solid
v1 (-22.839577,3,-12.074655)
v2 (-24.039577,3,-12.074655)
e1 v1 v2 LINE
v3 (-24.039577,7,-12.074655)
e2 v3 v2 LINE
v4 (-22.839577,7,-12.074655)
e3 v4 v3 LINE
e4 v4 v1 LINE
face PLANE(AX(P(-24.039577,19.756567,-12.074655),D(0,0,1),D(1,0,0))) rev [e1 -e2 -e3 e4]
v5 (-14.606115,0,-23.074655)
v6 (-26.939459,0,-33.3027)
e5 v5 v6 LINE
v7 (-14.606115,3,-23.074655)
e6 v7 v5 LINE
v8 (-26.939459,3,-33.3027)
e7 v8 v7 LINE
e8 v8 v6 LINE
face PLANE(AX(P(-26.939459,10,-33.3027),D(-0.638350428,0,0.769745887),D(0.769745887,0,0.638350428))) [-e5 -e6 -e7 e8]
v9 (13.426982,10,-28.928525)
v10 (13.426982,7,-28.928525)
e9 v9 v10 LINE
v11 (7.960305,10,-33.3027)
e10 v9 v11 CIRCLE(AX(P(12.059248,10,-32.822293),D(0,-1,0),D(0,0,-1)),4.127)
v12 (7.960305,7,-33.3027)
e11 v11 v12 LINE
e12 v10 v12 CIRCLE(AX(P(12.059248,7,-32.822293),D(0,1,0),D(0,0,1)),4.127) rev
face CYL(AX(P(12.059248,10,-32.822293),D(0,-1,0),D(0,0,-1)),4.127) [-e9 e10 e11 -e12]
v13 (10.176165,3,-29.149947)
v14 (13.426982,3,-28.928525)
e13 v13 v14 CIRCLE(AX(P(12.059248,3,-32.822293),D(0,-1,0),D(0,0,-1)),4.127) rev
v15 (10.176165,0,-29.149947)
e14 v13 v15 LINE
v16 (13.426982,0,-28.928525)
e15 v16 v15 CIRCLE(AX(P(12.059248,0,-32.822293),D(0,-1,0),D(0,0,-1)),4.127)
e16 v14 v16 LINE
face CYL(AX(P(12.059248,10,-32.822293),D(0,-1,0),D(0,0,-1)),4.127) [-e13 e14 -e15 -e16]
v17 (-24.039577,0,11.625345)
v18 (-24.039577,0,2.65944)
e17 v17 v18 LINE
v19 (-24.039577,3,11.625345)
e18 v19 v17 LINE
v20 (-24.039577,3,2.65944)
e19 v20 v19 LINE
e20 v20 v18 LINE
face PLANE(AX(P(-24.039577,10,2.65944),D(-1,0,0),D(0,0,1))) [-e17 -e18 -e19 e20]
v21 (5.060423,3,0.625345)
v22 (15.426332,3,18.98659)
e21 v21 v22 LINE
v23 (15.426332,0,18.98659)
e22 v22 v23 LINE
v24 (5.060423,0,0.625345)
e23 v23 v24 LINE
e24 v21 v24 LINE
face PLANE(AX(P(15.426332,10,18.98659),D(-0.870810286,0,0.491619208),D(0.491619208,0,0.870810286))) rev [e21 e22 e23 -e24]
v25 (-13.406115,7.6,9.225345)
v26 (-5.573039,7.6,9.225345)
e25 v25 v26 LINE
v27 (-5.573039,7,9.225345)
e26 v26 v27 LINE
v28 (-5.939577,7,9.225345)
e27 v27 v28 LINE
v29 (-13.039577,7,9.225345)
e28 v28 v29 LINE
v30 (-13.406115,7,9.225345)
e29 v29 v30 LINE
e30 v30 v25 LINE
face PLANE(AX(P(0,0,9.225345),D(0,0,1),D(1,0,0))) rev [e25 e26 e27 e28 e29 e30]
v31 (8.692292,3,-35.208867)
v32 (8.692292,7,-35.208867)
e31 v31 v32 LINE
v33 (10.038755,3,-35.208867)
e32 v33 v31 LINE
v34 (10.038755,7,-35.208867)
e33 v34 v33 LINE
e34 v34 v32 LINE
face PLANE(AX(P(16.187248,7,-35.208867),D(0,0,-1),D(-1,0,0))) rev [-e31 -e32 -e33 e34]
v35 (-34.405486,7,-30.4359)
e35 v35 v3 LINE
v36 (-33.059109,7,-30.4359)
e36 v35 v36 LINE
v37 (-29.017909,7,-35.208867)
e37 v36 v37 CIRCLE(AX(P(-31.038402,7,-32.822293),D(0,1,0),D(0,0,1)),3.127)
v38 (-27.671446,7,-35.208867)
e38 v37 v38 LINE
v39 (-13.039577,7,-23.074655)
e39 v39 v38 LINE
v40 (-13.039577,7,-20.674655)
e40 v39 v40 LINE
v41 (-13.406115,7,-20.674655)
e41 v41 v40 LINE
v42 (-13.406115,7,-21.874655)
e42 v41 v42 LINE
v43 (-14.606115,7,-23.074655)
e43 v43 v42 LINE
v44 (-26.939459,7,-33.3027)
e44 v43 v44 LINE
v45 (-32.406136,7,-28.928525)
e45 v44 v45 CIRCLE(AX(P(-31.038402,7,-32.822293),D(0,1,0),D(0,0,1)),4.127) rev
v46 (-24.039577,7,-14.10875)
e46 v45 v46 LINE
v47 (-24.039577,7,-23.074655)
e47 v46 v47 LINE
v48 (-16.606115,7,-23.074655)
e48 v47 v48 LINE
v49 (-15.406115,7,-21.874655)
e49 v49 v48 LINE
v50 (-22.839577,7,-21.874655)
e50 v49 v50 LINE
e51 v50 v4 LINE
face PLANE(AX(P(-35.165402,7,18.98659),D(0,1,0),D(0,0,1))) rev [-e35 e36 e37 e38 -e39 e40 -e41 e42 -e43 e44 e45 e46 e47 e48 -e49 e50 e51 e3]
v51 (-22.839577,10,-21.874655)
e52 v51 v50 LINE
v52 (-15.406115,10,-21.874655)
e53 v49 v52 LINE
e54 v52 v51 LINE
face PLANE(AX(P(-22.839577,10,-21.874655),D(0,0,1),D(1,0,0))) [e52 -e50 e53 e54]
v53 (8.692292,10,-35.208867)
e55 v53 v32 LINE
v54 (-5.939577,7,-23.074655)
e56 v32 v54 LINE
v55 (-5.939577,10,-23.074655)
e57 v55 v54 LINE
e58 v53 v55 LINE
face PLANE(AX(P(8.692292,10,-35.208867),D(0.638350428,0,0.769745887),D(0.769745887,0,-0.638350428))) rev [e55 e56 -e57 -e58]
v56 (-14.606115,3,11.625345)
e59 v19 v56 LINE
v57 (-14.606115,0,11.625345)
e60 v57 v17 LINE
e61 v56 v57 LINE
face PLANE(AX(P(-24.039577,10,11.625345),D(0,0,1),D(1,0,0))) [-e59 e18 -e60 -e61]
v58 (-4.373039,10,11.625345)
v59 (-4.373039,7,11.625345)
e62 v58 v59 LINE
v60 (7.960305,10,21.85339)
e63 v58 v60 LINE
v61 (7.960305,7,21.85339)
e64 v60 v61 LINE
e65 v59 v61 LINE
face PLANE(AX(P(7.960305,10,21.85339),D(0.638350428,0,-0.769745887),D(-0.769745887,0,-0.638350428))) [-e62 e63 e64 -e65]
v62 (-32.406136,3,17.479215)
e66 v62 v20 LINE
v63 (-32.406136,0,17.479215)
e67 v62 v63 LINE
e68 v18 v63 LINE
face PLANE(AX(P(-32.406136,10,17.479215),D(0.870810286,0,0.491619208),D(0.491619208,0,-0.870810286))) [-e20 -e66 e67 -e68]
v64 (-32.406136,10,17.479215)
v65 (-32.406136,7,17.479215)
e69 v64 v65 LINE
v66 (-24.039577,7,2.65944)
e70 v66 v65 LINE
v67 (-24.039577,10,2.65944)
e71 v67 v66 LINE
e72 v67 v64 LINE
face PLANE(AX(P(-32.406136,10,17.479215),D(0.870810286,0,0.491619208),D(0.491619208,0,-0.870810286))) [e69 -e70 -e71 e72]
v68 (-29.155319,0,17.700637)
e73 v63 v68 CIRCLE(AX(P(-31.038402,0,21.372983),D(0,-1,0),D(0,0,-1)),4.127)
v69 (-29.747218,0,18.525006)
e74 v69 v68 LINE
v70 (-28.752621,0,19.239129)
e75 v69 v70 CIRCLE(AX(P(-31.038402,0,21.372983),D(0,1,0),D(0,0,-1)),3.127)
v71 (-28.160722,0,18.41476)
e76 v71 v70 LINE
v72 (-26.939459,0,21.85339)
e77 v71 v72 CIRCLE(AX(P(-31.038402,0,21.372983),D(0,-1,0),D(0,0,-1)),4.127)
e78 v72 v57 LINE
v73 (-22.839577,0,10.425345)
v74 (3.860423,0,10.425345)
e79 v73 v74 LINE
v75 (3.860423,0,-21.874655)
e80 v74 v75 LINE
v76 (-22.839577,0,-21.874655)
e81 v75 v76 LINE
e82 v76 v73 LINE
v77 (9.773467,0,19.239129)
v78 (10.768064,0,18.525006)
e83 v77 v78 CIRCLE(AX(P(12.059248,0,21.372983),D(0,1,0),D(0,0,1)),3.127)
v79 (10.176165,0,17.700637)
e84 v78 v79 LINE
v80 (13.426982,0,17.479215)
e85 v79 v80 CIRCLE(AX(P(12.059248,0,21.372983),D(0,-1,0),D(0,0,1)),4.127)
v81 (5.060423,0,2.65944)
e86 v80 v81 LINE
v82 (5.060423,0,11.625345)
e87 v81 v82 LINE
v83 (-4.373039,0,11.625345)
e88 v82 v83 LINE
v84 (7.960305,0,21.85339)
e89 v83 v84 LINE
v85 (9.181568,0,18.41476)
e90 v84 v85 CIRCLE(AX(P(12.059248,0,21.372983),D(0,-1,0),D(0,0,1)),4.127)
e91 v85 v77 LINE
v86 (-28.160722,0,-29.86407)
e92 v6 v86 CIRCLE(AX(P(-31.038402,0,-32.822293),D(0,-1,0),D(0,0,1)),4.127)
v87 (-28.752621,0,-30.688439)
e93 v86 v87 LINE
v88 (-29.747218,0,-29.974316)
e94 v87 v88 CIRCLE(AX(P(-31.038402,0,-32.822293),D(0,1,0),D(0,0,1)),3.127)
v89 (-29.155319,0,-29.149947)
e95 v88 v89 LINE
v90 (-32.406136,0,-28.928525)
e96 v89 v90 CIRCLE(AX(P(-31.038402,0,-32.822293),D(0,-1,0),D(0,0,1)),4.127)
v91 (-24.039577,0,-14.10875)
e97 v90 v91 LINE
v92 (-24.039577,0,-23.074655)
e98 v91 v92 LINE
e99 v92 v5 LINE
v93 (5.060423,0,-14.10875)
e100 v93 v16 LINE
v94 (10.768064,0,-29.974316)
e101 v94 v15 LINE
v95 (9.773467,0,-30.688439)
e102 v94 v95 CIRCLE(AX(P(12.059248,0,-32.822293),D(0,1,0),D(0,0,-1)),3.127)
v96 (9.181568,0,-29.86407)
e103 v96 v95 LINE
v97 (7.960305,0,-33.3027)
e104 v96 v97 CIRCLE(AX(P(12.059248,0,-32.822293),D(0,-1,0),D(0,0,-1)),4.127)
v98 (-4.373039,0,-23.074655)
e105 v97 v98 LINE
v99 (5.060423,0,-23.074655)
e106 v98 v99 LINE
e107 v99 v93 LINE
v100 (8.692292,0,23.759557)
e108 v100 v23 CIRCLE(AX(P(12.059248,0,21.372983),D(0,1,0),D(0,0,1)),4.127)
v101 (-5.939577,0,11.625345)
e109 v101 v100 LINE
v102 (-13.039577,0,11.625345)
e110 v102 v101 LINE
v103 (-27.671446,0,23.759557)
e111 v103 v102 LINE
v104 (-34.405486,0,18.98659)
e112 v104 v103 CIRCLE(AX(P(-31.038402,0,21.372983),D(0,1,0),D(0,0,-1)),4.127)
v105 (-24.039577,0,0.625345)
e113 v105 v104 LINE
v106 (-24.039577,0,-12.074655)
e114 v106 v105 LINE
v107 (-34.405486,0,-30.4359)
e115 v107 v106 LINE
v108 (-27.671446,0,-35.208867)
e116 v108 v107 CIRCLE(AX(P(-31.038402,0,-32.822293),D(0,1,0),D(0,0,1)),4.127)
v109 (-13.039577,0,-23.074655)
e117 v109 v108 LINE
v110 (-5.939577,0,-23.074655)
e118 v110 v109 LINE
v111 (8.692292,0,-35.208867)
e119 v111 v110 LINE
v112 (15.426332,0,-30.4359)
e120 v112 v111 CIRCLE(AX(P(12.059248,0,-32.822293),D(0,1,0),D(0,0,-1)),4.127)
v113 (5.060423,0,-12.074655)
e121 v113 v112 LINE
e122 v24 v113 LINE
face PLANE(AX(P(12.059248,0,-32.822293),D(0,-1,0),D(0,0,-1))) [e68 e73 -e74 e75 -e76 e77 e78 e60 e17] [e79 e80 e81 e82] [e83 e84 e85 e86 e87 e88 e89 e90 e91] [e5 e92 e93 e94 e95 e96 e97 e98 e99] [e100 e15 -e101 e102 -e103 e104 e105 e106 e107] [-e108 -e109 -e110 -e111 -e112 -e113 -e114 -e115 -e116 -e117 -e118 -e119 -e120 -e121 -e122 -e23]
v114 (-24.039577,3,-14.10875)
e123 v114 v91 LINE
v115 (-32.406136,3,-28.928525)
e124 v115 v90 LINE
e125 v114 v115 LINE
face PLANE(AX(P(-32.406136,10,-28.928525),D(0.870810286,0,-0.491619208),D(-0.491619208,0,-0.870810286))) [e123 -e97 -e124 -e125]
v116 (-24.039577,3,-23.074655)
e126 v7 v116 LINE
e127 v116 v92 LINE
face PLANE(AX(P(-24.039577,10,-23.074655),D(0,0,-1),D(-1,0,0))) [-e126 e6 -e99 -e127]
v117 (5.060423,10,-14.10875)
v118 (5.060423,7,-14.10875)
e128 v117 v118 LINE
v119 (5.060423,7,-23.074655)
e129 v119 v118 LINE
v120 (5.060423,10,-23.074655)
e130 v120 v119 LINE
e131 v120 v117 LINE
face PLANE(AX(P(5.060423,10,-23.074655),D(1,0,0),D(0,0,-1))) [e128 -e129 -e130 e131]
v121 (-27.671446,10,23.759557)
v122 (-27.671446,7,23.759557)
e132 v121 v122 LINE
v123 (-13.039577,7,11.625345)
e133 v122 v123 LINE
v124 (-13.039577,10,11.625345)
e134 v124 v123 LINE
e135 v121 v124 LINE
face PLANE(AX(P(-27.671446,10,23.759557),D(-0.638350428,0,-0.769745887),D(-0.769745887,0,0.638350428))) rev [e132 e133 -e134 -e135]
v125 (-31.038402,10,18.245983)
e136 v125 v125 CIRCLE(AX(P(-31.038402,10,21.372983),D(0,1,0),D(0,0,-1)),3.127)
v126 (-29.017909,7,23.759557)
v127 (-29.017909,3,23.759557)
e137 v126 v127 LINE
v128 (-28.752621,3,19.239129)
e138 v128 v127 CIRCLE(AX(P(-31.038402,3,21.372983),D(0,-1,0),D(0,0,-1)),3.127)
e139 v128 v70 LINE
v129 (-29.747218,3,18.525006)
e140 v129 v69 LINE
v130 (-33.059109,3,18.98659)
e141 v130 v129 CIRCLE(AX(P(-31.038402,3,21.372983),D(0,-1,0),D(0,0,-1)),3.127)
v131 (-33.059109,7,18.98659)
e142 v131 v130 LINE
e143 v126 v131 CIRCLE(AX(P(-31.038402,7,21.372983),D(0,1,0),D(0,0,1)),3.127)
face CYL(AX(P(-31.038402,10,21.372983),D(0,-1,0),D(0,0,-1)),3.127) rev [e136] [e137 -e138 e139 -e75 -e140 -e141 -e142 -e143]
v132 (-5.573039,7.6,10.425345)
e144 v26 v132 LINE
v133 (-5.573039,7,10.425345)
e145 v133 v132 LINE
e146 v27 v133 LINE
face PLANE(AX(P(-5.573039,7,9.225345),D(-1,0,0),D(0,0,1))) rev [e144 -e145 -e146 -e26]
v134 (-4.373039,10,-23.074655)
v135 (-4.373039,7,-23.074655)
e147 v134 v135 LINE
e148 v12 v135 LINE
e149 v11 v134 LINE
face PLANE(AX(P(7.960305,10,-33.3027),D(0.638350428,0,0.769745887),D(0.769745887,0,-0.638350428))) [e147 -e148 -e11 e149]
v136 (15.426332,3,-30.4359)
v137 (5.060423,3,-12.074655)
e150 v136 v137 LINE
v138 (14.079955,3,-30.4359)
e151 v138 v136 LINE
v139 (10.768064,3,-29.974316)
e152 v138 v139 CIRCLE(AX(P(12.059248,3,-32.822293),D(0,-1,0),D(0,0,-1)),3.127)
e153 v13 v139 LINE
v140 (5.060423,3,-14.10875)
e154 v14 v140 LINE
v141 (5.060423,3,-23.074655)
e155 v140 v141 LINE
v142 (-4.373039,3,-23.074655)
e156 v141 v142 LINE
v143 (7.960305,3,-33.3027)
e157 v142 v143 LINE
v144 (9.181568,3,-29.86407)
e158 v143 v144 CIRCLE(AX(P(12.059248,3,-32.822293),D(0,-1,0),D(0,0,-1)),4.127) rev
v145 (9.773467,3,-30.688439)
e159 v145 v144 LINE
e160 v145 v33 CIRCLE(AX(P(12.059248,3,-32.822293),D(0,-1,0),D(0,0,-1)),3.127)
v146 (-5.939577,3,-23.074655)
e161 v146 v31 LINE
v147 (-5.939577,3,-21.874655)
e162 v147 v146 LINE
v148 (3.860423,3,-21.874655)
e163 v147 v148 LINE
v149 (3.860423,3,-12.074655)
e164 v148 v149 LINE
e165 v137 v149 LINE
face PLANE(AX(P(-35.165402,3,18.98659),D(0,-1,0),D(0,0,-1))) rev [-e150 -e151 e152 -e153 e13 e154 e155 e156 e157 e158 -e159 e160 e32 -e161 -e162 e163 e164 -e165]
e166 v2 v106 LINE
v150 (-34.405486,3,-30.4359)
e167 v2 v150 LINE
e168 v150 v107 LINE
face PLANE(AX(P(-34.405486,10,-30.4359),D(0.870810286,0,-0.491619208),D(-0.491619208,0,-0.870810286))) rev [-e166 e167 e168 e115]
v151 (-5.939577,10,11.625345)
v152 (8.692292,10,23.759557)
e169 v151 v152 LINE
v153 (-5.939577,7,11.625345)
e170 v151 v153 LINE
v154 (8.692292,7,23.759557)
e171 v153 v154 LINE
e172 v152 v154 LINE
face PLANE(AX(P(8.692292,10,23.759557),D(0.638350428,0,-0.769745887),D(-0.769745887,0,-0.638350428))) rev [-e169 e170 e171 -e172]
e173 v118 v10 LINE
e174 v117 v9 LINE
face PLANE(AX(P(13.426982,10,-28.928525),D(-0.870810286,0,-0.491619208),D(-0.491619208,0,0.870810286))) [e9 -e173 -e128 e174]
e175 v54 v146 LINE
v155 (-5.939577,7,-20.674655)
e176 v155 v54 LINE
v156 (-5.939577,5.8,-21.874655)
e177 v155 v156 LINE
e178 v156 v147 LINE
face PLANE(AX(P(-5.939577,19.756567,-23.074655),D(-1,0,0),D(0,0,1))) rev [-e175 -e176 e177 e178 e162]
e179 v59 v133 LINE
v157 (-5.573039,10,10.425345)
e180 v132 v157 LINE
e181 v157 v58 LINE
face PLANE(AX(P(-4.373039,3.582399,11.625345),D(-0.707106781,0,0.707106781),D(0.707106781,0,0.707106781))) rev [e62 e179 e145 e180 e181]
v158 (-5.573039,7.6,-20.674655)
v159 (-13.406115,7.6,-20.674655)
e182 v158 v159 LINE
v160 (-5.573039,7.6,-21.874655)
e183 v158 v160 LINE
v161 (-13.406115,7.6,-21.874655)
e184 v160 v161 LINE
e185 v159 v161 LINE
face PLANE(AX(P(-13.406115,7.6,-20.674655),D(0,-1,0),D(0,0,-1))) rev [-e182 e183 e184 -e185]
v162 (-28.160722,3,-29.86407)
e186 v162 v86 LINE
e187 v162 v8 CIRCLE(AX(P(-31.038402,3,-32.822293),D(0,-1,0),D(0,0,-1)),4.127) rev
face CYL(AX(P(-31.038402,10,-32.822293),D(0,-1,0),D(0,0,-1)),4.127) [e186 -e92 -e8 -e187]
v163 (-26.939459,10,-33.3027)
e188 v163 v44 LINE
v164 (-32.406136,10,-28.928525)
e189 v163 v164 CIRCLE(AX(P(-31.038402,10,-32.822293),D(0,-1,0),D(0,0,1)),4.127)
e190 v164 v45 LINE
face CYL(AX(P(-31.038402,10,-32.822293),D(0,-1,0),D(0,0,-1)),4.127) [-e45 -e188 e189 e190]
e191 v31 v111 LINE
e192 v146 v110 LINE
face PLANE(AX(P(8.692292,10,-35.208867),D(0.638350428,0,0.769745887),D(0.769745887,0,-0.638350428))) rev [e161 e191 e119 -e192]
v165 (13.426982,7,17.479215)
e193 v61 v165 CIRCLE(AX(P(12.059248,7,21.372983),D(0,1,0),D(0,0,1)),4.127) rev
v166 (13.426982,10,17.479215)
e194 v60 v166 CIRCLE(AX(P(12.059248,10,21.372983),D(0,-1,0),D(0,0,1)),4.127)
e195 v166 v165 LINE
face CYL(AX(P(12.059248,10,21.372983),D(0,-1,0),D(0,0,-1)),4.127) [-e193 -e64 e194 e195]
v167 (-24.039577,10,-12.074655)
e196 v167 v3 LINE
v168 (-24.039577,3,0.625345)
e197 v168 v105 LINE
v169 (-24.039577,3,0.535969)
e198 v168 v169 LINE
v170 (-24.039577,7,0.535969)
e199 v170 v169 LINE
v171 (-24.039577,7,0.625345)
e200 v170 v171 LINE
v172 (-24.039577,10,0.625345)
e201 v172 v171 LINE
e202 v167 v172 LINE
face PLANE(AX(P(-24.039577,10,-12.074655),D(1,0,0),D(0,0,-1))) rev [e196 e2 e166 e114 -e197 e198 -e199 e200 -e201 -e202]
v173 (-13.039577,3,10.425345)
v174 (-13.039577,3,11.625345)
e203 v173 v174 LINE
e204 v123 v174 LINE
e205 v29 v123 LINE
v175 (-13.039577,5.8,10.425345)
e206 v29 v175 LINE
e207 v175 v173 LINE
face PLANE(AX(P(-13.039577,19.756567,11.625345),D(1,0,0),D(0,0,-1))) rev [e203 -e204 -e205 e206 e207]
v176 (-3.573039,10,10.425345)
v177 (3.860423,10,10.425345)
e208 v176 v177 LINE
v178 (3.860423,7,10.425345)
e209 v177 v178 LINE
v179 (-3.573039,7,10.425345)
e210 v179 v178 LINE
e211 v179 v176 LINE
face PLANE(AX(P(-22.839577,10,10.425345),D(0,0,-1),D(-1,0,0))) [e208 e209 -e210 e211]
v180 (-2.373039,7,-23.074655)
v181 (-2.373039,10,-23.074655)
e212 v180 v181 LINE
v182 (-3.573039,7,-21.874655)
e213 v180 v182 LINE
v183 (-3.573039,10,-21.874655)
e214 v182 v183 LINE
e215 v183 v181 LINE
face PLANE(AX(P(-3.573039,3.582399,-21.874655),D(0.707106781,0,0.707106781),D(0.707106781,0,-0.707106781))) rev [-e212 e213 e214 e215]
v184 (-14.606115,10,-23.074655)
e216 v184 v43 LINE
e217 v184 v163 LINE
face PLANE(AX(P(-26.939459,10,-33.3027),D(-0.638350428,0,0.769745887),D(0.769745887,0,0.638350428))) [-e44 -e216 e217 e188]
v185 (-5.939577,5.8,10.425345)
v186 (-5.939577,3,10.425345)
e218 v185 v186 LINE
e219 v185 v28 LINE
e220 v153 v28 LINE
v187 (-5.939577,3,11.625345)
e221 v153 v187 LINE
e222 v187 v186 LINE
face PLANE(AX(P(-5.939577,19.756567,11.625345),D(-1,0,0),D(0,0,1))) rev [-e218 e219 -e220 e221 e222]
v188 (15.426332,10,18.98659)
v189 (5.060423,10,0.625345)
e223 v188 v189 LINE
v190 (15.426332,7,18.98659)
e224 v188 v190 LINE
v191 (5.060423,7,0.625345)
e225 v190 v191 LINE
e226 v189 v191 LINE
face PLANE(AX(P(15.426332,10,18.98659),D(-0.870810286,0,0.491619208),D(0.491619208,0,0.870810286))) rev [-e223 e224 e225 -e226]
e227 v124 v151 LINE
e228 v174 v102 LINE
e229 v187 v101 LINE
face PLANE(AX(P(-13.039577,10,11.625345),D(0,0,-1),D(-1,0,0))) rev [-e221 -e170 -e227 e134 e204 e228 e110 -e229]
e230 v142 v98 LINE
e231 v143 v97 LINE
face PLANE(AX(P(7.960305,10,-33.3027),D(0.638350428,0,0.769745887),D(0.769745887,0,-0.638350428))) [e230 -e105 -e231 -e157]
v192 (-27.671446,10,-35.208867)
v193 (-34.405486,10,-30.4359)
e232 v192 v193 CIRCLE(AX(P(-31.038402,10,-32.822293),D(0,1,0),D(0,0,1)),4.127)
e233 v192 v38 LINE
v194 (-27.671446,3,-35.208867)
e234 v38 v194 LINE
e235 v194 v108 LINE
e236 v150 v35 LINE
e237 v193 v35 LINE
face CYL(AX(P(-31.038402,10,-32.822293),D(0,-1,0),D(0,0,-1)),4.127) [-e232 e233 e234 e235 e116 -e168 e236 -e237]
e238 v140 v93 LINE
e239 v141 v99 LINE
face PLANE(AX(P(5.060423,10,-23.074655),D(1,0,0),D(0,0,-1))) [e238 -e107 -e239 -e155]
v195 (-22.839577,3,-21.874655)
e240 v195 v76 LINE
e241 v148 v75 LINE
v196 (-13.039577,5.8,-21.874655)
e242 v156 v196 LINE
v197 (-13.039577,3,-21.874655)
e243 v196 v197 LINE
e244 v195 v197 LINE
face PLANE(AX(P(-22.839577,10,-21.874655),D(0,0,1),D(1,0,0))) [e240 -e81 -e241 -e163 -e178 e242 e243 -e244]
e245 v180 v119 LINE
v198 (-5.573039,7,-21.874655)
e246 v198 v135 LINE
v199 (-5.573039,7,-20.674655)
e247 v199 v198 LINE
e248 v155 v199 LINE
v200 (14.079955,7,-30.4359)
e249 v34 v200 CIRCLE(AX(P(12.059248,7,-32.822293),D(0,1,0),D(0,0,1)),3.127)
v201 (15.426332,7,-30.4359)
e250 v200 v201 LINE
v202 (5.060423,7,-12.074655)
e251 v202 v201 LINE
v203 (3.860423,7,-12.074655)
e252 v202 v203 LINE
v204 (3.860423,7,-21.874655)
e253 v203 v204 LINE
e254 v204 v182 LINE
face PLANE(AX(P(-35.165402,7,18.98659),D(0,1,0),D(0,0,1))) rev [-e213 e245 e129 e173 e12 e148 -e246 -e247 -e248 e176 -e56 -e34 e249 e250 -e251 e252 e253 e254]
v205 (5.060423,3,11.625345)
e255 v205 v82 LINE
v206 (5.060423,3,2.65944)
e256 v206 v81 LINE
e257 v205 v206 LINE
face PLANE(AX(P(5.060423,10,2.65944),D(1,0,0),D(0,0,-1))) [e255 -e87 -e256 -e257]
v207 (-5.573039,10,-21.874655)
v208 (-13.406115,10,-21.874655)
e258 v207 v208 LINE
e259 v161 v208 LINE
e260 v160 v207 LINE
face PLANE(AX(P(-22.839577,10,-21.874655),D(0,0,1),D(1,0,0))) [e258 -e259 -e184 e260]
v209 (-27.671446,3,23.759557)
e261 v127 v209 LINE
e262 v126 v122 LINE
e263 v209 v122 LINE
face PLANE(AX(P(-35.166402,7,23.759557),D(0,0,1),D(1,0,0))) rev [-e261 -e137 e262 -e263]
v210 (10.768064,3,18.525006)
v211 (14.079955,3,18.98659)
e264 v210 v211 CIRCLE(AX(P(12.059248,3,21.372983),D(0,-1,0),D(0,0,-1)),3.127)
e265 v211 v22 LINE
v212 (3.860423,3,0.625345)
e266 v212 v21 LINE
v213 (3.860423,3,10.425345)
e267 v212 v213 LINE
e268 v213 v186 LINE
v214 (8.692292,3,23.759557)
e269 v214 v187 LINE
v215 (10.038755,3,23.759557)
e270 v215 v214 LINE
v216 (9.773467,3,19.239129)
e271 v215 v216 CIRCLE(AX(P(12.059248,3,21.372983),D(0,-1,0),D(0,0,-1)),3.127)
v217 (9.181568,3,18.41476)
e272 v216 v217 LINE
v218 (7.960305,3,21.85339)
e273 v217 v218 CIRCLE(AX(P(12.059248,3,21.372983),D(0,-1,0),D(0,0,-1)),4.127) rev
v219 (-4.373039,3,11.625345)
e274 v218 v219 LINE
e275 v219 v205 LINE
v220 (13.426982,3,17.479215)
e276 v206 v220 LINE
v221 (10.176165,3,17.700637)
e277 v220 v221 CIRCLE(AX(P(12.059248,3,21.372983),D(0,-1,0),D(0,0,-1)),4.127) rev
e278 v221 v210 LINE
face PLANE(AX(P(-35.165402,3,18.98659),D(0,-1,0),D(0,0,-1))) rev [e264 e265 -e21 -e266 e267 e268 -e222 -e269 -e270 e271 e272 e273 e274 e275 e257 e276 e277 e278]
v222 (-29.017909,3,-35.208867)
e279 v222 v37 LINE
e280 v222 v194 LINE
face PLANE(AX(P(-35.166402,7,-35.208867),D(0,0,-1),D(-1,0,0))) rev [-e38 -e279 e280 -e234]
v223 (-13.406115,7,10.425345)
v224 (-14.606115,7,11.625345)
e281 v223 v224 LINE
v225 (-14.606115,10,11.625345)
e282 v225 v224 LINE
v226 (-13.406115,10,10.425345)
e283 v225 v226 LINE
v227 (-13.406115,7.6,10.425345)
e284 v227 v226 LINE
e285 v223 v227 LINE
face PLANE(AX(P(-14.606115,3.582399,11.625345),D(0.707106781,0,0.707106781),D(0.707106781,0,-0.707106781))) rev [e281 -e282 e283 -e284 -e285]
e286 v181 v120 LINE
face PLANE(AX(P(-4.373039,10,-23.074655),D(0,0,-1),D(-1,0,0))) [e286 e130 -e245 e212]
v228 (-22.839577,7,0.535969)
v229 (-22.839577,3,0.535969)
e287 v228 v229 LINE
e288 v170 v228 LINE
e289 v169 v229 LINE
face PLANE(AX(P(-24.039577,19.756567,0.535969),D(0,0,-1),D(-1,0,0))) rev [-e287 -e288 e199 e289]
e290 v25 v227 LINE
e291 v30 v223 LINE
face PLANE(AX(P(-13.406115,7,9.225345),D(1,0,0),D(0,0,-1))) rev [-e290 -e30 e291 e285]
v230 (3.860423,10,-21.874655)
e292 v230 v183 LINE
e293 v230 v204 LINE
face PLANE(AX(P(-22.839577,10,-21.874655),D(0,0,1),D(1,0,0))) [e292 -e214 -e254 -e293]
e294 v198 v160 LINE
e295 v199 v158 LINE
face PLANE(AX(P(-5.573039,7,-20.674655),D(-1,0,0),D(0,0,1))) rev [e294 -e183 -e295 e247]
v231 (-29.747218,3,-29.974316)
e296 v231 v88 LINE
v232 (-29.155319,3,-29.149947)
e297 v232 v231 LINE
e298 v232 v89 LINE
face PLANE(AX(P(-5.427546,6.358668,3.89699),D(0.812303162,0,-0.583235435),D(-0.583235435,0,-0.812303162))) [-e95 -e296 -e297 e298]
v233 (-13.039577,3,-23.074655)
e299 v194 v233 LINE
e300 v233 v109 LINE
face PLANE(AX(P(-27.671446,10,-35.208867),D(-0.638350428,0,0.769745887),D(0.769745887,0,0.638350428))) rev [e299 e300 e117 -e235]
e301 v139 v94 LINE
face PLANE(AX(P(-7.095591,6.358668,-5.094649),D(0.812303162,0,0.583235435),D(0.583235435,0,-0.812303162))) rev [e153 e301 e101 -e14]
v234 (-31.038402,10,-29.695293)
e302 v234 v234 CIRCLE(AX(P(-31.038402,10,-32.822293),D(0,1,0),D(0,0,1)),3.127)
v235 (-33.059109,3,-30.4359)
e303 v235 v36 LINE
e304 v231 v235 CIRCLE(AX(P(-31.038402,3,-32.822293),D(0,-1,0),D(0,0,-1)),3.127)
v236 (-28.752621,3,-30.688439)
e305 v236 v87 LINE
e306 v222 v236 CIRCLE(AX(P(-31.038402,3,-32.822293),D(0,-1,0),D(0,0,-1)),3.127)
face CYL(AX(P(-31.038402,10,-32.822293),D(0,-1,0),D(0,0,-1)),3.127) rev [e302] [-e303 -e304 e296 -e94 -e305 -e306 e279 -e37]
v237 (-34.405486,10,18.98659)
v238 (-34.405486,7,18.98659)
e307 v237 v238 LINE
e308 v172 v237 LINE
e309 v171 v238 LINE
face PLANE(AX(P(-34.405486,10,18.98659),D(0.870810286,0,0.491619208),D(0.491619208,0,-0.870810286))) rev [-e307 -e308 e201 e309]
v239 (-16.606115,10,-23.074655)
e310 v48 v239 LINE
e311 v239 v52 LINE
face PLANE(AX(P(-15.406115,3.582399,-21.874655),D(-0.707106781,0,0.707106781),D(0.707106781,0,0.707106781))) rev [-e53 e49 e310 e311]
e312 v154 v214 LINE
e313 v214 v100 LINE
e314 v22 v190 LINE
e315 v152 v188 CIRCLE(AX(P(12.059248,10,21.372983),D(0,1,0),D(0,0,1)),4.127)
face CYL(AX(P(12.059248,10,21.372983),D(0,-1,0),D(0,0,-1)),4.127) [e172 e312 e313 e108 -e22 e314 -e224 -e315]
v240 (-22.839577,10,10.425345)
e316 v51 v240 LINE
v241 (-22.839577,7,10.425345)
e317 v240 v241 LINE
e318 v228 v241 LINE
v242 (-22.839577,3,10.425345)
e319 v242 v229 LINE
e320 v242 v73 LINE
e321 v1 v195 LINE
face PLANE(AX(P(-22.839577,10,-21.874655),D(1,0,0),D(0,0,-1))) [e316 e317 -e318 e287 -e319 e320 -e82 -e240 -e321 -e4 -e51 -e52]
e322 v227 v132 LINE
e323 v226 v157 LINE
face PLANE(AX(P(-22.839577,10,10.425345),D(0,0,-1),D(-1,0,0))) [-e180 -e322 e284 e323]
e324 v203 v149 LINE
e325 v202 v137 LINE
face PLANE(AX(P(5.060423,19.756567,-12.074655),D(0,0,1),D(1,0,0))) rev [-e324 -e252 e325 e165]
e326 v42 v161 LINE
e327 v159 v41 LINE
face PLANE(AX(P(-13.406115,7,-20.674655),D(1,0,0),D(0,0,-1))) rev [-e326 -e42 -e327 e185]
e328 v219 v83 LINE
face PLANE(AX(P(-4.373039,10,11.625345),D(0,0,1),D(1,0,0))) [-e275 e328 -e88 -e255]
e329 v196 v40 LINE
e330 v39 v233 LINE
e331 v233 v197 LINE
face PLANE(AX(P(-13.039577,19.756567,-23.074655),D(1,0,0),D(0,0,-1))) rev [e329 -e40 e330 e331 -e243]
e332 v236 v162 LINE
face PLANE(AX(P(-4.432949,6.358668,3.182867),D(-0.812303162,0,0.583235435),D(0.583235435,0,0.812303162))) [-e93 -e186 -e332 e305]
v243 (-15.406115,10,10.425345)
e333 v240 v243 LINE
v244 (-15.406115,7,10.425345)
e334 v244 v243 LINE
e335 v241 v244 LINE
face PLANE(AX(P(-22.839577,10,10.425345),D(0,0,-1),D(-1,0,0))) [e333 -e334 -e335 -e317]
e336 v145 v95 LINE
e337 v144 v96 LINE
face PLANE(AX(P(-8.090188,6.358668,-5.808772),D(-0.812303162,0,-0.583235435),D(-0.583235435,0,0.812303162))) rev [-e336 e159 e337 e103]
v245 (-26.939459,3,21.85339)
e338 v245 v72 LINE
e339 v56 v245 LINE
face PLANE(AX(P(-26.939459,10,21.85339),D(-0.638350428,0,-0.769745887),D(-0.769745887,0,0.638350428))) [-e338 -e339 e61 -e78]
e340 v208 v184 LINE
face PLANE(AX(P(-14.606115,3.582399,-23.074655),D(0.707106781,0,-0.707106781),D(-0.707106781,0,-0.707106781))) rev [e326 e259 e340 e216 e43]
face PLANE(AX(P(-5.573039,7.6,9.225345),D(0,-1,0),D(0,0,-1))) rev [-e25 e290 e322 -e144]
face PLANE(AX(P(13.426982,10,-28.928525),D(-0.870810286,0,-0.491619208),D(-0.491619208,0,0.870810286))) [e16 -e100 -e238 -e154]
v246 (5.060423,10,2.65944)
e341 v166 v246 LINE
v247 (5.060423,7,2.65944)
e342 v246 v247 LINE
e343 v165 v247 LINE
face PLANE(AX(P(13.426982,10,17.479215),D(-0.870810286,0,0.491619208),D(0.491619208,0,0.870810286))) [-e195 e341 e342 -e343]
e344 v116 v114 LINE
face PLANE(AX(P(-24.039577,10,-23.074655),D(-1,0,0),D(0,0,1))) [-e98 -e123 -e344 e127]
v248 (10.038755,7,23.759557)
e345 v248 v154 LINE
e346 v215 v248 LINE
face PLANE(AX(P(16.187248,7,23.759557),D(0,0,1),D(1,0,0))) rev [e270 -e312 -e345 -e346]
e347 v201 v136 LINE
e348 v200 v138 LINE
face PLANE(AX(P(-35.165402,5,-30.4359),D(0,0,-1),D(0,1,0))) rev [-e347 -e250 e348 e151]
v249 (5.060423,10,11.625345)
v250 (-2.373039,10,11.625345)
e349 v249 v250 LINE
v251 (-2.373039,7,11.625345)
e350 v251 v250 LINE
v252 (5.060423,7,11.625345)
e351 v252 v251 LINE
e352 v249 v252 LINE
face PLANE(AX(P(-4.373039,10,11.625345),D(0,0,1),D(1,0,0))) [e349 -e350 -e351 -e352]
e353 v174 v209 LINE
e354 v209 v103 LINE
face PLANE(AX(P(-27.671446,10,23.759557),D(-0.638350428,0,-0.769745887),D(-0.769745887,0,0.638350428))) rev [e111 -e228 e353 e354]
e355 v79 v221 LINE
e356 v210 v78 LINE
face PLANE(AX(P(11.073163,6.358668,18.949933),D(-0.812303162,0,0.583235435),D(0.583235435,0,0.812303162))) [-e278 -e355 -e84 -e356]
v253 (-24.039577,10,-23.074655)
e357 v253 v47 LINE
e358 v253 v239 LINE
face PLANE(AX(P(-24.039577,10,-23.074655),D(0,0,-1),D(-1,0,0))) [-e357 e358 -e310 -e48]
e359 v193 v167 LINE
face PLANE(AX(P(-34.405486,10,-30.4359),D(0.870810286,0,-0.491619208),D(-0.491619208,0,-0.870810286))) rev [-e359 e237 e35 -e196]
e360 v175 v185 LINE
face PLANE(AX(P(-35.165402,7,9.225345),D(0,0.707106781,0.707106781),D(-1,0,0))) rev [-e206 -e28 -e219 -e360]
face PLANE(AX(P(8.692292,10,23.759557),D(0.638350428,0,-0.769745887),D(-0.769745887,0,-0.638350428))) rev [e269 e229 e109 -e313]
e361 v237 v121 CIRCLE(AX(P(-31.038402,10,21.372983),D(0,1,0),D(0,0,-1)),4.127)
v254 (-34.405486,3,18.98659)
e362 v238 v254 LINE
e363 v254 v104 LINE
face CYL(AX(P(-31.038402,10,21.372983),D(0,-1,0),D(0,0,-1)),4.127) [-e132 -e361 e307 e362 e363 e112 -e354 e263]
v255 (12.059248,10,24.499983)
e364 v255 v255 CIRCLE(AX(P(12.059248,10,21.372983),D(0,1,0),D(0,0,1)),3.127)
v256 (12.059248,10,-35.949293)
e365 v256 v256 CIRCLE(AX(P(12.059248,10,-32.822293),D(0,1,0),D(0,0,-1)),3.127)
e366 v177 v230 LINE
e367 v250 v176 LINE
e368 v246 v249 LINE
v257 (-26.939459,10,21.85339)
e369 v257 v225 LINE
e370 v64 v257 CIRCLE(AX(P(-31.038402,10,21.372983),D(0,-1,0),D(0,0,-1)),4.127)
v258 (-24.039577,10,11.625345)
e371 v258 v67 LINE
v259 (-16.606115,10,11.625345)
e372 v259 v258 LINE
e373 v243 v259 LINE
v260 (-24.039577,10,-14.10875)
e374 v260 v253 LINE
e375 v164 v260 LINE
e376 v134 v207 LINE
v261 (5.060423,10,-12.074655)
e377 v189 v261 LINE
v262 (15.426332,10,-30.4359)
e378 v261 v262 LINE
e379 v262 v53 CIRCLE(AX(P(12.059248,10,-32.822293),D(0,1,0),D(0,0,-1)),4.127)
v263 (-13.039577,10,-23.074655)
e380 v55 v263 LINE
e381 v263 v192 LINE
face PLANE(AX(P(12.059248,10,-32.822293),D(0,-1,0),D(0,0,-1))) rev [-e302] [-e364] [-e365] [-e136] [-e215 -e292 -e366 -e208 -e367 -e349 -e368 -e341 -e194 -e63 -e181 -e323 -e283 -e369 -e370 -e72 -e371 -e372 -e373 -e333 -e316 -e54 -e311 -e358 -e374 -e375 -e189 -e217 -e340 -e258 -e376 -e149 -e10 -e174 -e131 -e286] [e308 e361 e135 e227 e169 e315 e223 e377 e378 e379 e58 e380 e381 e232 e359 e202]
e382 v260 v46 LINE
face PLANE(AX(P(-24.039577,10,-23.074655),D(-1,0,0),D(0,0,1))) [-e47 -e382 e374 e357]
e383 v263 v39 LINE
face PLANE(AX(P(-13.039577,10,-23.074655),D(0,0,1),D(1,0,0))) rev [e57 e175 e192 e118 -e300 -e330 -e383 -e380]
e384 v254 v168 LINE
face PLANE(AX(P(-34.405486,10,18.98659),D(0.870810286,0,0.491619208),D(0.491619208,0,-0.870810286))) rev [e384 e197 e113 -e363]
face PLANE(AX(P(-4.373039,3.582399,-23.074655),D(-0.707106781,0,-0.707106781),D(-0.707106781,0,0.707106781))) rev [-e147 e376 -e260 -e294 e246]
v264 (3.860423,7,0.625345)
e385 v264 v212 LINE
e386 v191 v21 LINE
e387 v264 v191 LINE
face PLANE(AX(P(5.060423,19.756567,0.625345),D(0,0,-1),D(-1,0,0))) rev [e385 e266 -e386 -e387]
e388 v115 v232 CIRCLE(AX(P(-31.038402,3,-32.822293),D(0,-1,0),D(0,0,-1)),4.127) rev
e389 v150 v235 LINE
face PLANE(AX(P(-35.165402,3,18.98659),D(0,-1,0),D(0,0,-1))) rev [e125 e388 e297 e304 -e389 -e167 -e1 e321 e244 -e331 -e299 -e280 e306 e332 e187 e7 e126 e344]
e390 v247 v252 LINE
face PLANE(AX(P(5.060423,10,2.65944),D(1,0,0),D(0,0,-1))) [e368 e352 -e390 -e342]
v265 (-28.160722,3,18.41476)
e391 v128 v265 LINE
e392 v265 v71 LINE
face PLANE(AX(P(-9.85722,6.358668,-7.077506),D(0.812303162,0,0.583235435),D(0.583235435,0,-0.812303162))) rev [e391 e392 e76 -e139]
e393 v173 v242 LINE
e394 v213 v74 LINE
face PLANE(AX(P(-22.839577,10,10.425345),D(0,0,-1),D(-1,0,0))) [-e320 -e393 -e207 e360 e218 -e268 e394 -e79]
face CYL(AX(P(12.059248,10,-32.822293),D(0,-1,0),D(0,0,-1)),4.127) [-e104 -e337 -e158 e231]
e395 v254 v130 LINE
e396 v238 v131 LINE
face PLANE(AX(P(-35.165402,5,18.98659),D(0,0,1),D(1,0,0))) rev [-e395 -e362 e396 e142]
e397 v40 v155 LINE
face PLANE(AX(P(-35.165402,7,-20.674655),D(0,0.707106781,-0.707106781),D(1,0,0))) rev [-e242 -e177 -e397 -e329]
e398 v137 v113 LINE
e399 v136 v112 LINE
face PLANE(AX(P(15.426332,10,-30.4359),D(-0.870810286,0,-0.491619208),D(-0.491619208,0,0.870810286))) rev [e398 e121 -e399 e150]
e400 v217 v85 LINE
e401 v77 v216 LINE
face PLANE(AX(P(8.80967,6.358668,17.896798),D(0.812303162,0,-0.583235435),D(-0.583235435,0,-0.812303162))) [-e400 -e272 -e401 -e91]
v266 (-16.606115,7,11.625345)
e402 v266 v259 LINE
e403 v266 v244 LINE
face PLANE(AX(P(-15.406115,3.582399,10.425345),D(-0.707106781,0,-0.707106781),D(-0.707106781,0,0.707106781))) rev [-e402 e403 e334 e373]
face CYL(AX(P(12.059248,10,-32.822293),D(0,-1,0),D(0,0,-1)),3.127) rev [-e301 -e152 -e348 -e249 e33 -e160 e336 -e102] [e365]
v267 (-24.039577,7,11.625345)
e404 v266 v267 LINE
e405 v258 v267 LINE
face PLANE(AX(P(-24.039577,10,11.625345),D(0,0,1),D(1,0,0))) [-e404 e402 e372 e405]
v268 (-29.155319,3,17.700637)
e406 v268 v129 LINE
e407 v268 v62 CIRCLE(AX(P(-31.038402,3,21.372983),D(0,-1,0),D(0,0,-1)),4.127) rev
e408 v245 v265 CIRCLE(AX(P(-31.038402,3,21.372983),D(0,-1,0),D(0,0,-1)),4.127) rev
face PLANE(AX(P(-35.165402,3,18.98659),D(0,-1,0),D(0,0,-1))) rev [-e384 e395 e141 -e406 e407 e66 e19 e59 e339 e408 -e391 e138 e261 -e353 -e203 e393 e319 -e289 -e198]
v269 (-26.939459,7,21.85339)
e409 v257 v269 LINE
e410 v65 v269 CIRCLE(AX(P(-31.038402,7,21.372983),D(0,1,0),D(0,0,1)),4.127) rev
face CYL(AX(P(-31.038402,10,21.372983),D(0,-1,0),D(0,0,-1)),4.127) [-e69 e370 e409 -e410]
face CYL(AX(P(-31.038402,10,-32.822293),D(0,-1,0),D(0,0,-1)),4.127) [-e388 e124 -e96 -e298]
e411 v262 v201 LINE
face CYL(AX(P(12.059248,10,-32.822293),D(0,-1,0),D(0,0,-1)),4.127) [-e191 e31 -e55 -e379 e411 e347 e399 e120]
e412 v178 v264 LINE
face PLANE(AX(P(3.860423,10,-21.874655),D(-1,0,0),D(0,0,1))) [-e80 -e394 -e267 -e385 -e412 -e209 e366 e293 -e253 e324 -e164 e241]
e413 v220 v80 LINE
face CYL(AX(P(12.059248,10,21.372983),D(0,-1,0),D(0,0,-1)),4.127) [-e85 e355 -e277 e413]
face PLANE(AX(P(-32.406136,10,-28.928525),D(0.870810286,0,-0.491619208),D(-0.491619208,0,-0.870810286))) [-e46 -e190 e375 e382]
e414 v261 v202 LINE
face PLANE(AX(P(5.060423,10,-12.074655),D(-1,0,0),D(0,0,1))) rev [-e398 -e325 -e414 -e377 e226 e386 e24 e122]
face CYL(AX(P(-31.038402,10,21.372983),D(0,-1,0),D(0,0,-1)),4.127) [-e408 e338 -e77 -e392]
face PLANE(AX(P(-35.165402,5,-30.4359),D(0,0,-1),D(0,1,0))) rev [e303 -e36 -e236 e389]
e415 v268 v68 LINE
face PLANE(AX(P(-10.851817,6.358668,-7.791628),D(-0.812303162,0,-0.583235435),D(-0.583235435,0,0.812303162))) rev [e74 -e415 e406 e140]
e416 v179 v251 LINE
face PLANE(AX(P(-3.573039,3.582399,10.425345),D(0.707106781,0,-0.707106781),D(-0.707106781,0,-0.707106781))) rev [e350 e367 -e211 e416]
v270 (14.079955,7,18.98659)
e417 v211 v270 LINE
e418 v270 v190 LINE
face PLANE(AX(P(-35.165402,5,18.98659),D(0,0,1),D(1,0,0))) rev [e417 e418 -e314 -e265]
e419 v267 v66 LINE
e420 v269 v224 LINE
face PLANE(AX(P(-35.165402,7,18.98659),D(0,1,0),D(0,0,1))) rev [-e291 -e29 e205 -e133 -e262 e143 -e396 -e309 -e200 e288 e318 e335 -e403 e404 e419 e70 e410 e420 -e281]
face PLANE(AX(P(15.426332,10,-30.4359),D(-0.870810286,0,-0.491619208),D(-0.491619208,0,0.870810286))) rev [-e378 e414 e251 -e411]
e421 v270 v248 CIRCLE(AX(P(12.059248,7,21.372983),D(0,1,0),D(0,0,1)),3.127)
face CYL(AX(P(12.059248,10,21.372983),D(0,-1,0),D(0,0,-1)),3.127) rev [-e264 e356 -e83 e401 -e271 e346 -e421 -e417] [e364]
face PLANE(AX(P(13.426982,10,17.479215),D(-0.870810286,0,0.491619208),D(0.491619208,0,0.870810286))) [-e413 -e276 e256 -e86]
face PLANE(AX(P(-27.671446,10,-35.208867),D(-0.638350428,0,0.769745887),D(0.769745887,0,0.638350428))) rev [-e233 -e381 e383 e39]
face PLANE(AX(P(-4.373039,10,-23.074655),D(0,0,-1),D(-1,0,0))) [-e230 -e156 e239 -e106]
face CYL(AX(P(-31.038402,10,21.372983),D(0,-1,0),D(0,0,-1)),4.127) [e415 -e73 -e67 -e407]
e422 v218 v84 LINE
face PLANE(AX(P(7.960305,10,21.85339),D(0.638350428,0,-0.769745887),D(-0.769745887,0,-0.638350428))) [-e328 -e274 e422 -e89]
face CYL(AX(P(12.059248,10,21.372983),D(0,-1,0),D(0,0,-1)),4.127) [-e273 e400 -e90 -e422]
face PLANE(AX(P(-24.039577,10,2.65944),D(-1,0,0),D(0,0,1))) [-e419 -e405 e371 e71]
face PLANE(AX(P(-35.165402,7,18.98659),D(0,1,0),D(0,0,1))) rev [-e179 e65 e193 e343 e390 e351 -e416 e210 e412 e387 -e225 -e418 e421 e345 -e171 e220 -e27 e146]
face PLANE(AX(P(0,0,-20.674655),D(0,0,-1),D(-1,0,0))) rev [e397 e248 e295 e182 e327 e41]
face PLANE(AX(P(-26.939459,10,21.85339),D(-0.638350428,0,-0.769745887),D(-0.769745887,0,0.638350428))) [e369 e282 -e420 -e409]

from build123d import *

# Parameters (mm, degrees)
SKETCH2_R               = 3.127
SKETCH2_W               = 26.7
SKETCH2_H               = 32.3
BOSS_EXTRUDE1_DEPTH     = 10
CUT_EXTRUDE1_DEPTH      = 52.979378239
CUT_EXTRUDE1_DEPTH_BACK = 52.979378239
CUT_EXTRUDE2_DEPTH      = 52.979378239
CUT_EXTRUDE2_DEPTH_BACK = 52.979378239
CUT_EXTRUDE3_REACH      = 60.213
CUT_EXTRUDE3_END_RADIUS = 3.127
SKETCH6_W               = 4.772967813
SKETCH6_H               = 4
CUT_EXTRUDE4_REACH      = 60.213
CUT_EXTRUDE4_END_RADIUS = 3.127
SKETCH7_W               = 4.772967813
SKETCH7_H               = 4
CUT_EXTRUDE5_REACH      = 60.213
CUT_EXTRUDE5_END_RADIUS = 3.127
SKETCH8_W               = 4.772967813
SKETCH8_H               = 4
CUT_EXTRUDE6_REACH      = 60.213
CUT_EXTRUDE6_END_RADIUS = 3.127
SKETCH9_W               = 4.772967813
SKETCH9_H               = 4
SKETCH10_W              = 1.2
SKETCH10_H              = 12.610624374
SKETCH10_W_2            = 7.1
SKETCH10_H_2            = 1.2
SKETCH10_H_3            = 12.7
BOSS_EXTRUDE2_DEPTH     = 4
CUT_EXTRUDE7_DEPTH      = 3
CUT_EXTRUDE9_DEPTH      = 3
SKETCH13_W              = 7.833075365
SKETCH13_H              = 0.6
BOSS_EXTRUDE3_DEPTH     = 1.2
CHAMFER1_SIZE           = 1.2
SKETCH14_W              = 7.833075365
SKETCH14_H              = 0.6
BOSS_EXTRUDE4_DEPTH     = 1.2
CHAMFER2_SIZE           = 1.2


with BuildPart() as part:
    # Sketch2 → Boss-Extrude1 (new body)
    with BuildSketch(Plane(origin=(0, 0, 0), x_dir=(1, 0, 0), z_dir=(0, 1, 0))):
        with BuildLine():
            Line((-34.405486348, 30.435899661), (-24.03957695, 12.074655042))
            Line((-24.03957695, 12.074655042), (-24.03957695, -0.625344958))
            Line((-24.03957695, -0.625344958), (-34.405486348, -18.986589577))
            ThreePointArc((-34.405486348, -18.986589577), (-33.424886075, -24.740002888), (-27.671446386, -23.75955739))
            Line((-27.671446386, -23.75955739), (-13.03957695, -11.625344958))
            Line((-13.03957695, -11.625344958), (-5.93957695, -11.625344958))
            Line((-5.93957695, -11.625344958), (8.692292487, -23.75955739))
            ThreePointArc((8.692292487, -23.75955739), (14.445732176, -24.740002888), (15.426332449, -18.986589577))
            Line((15.426332449, -18.986589577), (5.06042305, -0.625344958))
            Line((5.06042305, -0.625344958), (5.06042305, 12.074655042))
            Line((5.06042305, 12.074655042), (15.426332449, 30.435899661))
            ThreePointArc((15.426332449, 30.435899661), (14.445732176, 36.189312973), (8.692292487, 35.208867474))
            Line((8.692292487, 35.208867474), (-5.93957695, 23.074655042))
            Line((-5.93957695, 23.074655042), (-13.03957695, 23.074655042))
            Line((-13.03957695, 23.074655042), (-27.671446386, 35.208867474))
            ThreePointArc((-27.671446386, 35.208867474), (-33.424886075, 36.189312973), (-34.405486348, 30.435899661))
        make_face()
        with Locations(Location((-31.038402168, 32.82229299, 0), (0, 0, 270))):
            Circle(SKETCH2_R, mode=Mode.SUBTRACT)
        with Locations(Location((12.059248268, 32.82229299, 0), (0, 0, 90))):
            Circle(SKETCH2_R, mode=Mode.SUBTRACT)
        with Locations(Location((-31.038402168, -21.372982906, 0), (0, 0, 90))):
            Circle(SKETCH2_R, mode=Mode.SUBTRACT)
        with Locations(Location((12.059248268, -21.372982906, 0), (0, 0, 270))):
            Circle(SKETCH2_R, mode=Mode.SUBTRACT)
        with BuildLine():
            Line((-24.03957695, 23.074655042), (-14.606114632, 23.074655042))
            Line((-14.606114632, 23.074655042), (-26.939458612, 33.302699824))
            ThreePointArc((-26.939458612, 33.302699824), (-28.459986314, 29.599886951), (-32.406136372, 28.928524617))
            Line((-32.406136372, 28.928524617), (-24.03957695, 14.108749692))
            Line((-24.03957695, 14.108749692), (-24.03957695, 23.074655042))
        make_face(mode=Mode.SUBTRACT)
        with Locations((-9.48957695, 5.724655042)):
            Rectangle(SKETCH2_W, SKETCH2_H, mode=Mode.SUBTRACT)
        with BuildLine():
            Line((5.06042305, 23.074655042), (5.06042305, 14.108749692))
            Line((5.06042305, 14.108749692), (13.426982473, 28.928524617))
            ThreePointArc((13.426982473, 28.928524617), (9.480832414, 29.599886951), (7.960304713, 33.302699824))
            Line((7.960304713, 33.302699824), (-4.373039267, 23.074655042))
            Line((-4.373039267, 23.074655042), (5.06042305, 23.074655042))
        make_face(mode=Mode.SUBTRACT)
        with BuildLine():
            Line((-24.03957695, -11.625344958), (-14.606114632, -11.625344958))
            Line((-14.606114632, -11.625344958), (-26.939458612, -21.85338974))
            ThreePointArc((-26.939458612, -21.85338974), (-28.459986314, -18.150576866), (-32.406136372, -17.479214533))
            Line((-32.406136372, -17.479214533), (-24.03957695, -2.659439608))
            Line((-24.03957695, -2.659439608), (-24.03957695, -11.625344958))
        make_face(mode=Mode.SUBTRACT)
        with BuildLine():
            Line((7.960304713, -21.85338974), (-4.373039267, -11.625344958))
            Line((-4.373039267, -11.625344958), (5.06042305, -11.625344958))
            Line((5.06042305, -11.625344958), (5.06042305, -2.659439608))
            Line((5.06042305, -2.659439608), (13.426982473, -17.479214533))
            ThreePointArc((13.426982473, -17.479214533), (9.480832414, -18.150576866), (7.960304713, -21.85338974))
        make_face(mode=Mode.SUBTRACT)
    extrude(amount=BOSS_EXTRUDE1_DEPTH)

    # Sketch4 → Cut-Extrude1 (cut, two sides: drawn at the far end of the back side and taken through both)
    with BuildSketch(Plane(origin=(0, 0, 0), x_dir=(0, 0, -1), z_dir=(1, 0, 0)).offset(-CUT_EXTRUDE1_DEPTH_BACK)):
        Polygon((-18.986589577, 5), (-18.986589577, 7), (30.435899661, 7), (30.435899661, 5), (30.435899661, 3), (-18.986589577, 3), align=None)
    extrude(amount=CUT_EXTRUDE1_DEPTH + CUT_EXTRUDE1_DEPTH_BACK, mode=Mode.SUBTRACT)

    # Sketch5 → Cut-Extrude2 (cut, two sides: drawn at the far end of the back side and taken through both)
    with BuildSketch(Plane.XY.offset(-CUT_EXTRUDE2_DEPTH_BACK)):
        Polygon((-27.671446386, 5), (-27.671446386, 7), (8.692292487, 7), (8.692292487, 5), (8.692292487, 3), (-27.671446386, 3), align=None)
    extrude(amount=CUT_EXTRUDE2_DEPTH + CUT_EXTRUDE2_DEPTH_BACK, mode=Mode.SUBTRACT)

    # Cut-Extrude3: up to this cylinder (the profile starts outside it)
    cut_extrude3_end = Plane(origin=(-31.038402168, 5, -32.82229299), z_dir=(0, -1, 0)) * Cylinder(CUT_EXTRUDE3_END_RADIUS, 127.68, mode=Mode.PRIVATE)
    # Sketch6 → Cut-Extrude3 (cut, up to the surface)
    with BuildSketch(Plane(origin=(-27.671446386, 0, 0), x_dir=(0, 0, -1), z_dir=(1, 0, 0)), mode=Mode.PRIVATE) as cut_extrude3_sk1:
        with Locations((32.822383567, 5)):
            Rectangle(SKETCH6_W, SKETCH6_H)
    cut_extrude3_tool1 = extrude(cut_extrude3_sk1.sketch, amount=-CUT_EXTRUDE3_REACH, mode=Mode.PRIVATE) - cut_extrude3_end
    add(cut_extrude3_tool1.solids().sort_by_distance((-27.671446, 5, -32.822384))[0], mode=Mode.SUBTRACT)

    # Cut-Extrude4: up to this cylinder (the profile starts outside it)
    cut_extrude4_end = Plane(origin=(-31.038402168, 5, 21.372982906), z_dir=(0, -1, 0)) * Cylinder(CUT_EXTRUDE4_END_RADIUS, 127.68, mode=Mode.PRIVATE)
    # Sketch7 → Cut-Extrude4 (cut, up to the surface)
    with BuildSketch(Plane(origin=(-27.671446386, 0, 0), x_dir=(0, 0, -1), z_dir=(1, 0, 0)), mode=Mode.PRIVATE) as cut_extrude4_sk1:
        with Locations((-21.373073484, 5)):
            Rectangle(SKETCH7_W, SKETCH7_H)
    cut_extrude4_tool1 = extrude(cut_extrude4_sk1.sketch, amount=-CUT_EXTRUDE4_REACH, mode=Mode.PRIVATE) - cut_extrude4_end
    add(cut_extrude4_tool1.solids().sort_by_distance((-27.671446, 5, 21.373073))[0], mode=Mode.SUBTRACT)

    # Cut-Extrude5: up to this cylinder (the profile starts outside it)
    cut_extrude5_end = Plane(origin=(12.059248268, 5, -32.82229299), z_dir=(0, -1, 0)) * Cylinder(CUT_EXTRUDE5_END_RADIUS, 127.68, mode=Mode.PRIVATE)
    # Sketch8 → Cut-Extrude5 (cut, up to the surface)
    with BuildSketch(Plane.ZY.offset(-8.692292487), mode=Mode.PRIVATE) as cut_extrude5_sk1:
        with Locations((-32.822383567, 5)):
            Rectangle(SKETCH8_W, SKETCH8_H)
    cut_extrude5_tool1 = extrude(cut_extrude5_sk1.sketch, amount=-CUT_EXTRUDE5_REACH, mode=Mode.PRIVATE) - cut_extrude5_end
    add(cut_extrude5_tool1.solids().sort_by_distance((8.692292, 5, -32.822384))[0], mode=Mode.SUBTRACT)

    # Cut-Extrude6: up to this cylinder (the profile starts outside it)
    cut_extrude6_end = Plane(origin=(12.059248268, 5, 21.372982906), z_dir=(0, -1, 0)) * Cylinder(CUT_EXTRUDE6_END_RADIUS, 127.68, mode=Mode.PRIVATE)
    # Sketch9 → Cut-Extrude6 (cut, up to the surface)
    with BuildSketch(Plane.ZY.offset(-8.692292487), mode=Mode.PRIVATE) as cut_extrude6_sk1:
        with Locations((21.373073484, 5)):
            Rectangle(SKETCH9_W, SKETCH9_H)
    cut_extrude6_tool1 = extrude(cut_extrude6_sk1.sketch, amount=-CUT_EXTRUDE6_REACH, mode=Mode.PRIVATE) - cut_extrude6_end
    add(cut_extrude6_tool1.solids().sort_by_distance((8.692292, 5, 21.373073))[0], mode=Mode.SUBTRACT)

    # Sketch10 → Boss-Extrude2 (add)
    with BuildSketch(Plane(origin=(0, 3, 0), x_dir=(1, 0, 0), z_dir=(0, 1, 0))):
        with Locations((-23.43957695, 5.769342855)):
            Rectangle(SKETCH10_W, SKETCH10_H)
        with Locations((-9.48957695, 22.474655042)):
            Rectangle(SKETCH10_W_2, SKETCH10_H_2)
        with Locations((4.46042305, 5.724655042)):
            Rectangle(SKETCH10_W, SKETCH10_H_3)
        with Locations((-9.48957695, -11.025344958)):
            Rectangle(SKETCH10_W_2, SKETCH10_H_2)
    extrude(amount=BOSS_EXTRUDE2_DEPTH)

    # Sketch11 → Cut-Extrude7 (cut)
    with BuildSketch(Plane.XZ):
        with BuildLine():
            ThreePointArc((9.773467047, -30.688438916), (10.235471064, -30.282221002), (10.768064045, -29.974316112))
            Line((10.768064045, -29.974316112), (10.176165075, -29.14994678))
            ThreePointArc((10.176165075, -29.14994678), (9.652235629, -29.469917839), (9.181568077, -29.864069585))
            Line((9.181568077, -29.864069585), (9.773467047, -30.688438916))
        make_face()
        with BuildLine():
            ThreePointArc((-28.160721976, -29.864069585), (-28.631389528, -29.469917839), (-29.155318974, -29.14994678))
            Line((-29.155318974, -29.14994678), (-29.747217945, -29.974316112))
            ThreePointArc((-29.747217945, -29.974316112), (-29.214624963, -30.282221002), (-28.752620946, -30.688438916))
            Line((-28.752620946, -30.688438916), (-28.160721976, -29.864069585))
        make_face()
        with BuildLine():
            Line((-28.160721976, 18.414759501), (-28.752620946, 19.239128832))
            ThreePointArc((-28.752620946, 19.239128832), (-29.214624963, 18.832910917), (-29.747217945, 18.525006027))
            Line((-29.747217945, 18.525006027), (-29.155318974, 17.700636696))
            ThreePointArc((-29.155318974, 17.700636696), (-28.631389528, 18.020607755), (-28.160721976, 18.414759501))
        make_face()
        Polygon((11.073162581, 18.949933064), (9.804267287, 17.182674769), (8.809670289, 17.896797574), (10.078565582, 19.664055869), align=None)
    extrude(amount=-CUT_EXTRUDE7_DEPTH, mode=Mode.SUBTRACT)

    # Sketch12 → Cut-Extrude9 (cut)
    with BuildSketch(Plane(origin=(0, 10, 0), x_dir=(1, 0, 0), z_dir=(0, 1, 0))):
        Polygon((-14.606114632, 23.074655042), (-13.406114632, 21.874655042), (-15.406114632, 21.874655042), (-16.606114632, 23.074655042), align=None)
        Polygon((-3.573039267, 21.874655042), (-2.373039267, 23.074655042), (-4.373039267, 23.074655042), (-5.573039267, 21.874655042), align=None)
        Polygon((-15.406114632, -10.425344958), (-16.606114632, -11.625344958), (-14.606114632, -11.625344958), (-13.406114632, -10.425344958), align=None)
        Polygon((-5.573039267, -10.425344958), (-3.573039267, -10.425344958), (-2.373039267, -11.625344958), (-4.373039267, -11.625344958), align=None)
    extrude(amount=-CUT_EXTRUDE9_DEPTH, mode=Mode.SUBTRACT)

    # Sketch13 → Boss-Extrude3 (add)
    with BuildSketch(Plane.XY.offset(-21.874655042)):
        with Locations((-9.48957695, 7.3)):
            Rectangle(SKETCH13_W, SKETCH13_H)
    extrude(amount=BOSS_EXTRUDE3_DEPTH)

    # Chamfer1
    chamfer1_edges = [part.edges().sort_by_distance(p)[0] for p in [
        (-9.48957695, 7, -21.874655042),
    ]]
    chamfer(chamfer1_edges, length=CHAMFER1_SIZE - 0.0001)  # a hair under: the kernel refuses the full size

    # Sketch14 → Boss-Extrude4 (add)
    with BuildSketch(Plane(origin=(0, 0, 10.425344958), x_dir=(-1, 0, 0), z_dir=(0, 0, -1))):
        with Locations((9.48957695, 7.3)):
            Rectangle(SKETCH14_W, SKETCH14_H)
    extrude(amount=BOSS_EXTRUDE4_DEPTH)

    # Chamfer2
    chamfer2_edges = [part.edges().sort_by_distance(p)[0] for p in [
        (-9.48957695, 7, 10.425344958),
    ]]
    chamfer(chamfer2_edges, length=CHAMFER2_SIZE - 0.0001)  # a hair under: the kernel refuses the full size


solid = part.part
